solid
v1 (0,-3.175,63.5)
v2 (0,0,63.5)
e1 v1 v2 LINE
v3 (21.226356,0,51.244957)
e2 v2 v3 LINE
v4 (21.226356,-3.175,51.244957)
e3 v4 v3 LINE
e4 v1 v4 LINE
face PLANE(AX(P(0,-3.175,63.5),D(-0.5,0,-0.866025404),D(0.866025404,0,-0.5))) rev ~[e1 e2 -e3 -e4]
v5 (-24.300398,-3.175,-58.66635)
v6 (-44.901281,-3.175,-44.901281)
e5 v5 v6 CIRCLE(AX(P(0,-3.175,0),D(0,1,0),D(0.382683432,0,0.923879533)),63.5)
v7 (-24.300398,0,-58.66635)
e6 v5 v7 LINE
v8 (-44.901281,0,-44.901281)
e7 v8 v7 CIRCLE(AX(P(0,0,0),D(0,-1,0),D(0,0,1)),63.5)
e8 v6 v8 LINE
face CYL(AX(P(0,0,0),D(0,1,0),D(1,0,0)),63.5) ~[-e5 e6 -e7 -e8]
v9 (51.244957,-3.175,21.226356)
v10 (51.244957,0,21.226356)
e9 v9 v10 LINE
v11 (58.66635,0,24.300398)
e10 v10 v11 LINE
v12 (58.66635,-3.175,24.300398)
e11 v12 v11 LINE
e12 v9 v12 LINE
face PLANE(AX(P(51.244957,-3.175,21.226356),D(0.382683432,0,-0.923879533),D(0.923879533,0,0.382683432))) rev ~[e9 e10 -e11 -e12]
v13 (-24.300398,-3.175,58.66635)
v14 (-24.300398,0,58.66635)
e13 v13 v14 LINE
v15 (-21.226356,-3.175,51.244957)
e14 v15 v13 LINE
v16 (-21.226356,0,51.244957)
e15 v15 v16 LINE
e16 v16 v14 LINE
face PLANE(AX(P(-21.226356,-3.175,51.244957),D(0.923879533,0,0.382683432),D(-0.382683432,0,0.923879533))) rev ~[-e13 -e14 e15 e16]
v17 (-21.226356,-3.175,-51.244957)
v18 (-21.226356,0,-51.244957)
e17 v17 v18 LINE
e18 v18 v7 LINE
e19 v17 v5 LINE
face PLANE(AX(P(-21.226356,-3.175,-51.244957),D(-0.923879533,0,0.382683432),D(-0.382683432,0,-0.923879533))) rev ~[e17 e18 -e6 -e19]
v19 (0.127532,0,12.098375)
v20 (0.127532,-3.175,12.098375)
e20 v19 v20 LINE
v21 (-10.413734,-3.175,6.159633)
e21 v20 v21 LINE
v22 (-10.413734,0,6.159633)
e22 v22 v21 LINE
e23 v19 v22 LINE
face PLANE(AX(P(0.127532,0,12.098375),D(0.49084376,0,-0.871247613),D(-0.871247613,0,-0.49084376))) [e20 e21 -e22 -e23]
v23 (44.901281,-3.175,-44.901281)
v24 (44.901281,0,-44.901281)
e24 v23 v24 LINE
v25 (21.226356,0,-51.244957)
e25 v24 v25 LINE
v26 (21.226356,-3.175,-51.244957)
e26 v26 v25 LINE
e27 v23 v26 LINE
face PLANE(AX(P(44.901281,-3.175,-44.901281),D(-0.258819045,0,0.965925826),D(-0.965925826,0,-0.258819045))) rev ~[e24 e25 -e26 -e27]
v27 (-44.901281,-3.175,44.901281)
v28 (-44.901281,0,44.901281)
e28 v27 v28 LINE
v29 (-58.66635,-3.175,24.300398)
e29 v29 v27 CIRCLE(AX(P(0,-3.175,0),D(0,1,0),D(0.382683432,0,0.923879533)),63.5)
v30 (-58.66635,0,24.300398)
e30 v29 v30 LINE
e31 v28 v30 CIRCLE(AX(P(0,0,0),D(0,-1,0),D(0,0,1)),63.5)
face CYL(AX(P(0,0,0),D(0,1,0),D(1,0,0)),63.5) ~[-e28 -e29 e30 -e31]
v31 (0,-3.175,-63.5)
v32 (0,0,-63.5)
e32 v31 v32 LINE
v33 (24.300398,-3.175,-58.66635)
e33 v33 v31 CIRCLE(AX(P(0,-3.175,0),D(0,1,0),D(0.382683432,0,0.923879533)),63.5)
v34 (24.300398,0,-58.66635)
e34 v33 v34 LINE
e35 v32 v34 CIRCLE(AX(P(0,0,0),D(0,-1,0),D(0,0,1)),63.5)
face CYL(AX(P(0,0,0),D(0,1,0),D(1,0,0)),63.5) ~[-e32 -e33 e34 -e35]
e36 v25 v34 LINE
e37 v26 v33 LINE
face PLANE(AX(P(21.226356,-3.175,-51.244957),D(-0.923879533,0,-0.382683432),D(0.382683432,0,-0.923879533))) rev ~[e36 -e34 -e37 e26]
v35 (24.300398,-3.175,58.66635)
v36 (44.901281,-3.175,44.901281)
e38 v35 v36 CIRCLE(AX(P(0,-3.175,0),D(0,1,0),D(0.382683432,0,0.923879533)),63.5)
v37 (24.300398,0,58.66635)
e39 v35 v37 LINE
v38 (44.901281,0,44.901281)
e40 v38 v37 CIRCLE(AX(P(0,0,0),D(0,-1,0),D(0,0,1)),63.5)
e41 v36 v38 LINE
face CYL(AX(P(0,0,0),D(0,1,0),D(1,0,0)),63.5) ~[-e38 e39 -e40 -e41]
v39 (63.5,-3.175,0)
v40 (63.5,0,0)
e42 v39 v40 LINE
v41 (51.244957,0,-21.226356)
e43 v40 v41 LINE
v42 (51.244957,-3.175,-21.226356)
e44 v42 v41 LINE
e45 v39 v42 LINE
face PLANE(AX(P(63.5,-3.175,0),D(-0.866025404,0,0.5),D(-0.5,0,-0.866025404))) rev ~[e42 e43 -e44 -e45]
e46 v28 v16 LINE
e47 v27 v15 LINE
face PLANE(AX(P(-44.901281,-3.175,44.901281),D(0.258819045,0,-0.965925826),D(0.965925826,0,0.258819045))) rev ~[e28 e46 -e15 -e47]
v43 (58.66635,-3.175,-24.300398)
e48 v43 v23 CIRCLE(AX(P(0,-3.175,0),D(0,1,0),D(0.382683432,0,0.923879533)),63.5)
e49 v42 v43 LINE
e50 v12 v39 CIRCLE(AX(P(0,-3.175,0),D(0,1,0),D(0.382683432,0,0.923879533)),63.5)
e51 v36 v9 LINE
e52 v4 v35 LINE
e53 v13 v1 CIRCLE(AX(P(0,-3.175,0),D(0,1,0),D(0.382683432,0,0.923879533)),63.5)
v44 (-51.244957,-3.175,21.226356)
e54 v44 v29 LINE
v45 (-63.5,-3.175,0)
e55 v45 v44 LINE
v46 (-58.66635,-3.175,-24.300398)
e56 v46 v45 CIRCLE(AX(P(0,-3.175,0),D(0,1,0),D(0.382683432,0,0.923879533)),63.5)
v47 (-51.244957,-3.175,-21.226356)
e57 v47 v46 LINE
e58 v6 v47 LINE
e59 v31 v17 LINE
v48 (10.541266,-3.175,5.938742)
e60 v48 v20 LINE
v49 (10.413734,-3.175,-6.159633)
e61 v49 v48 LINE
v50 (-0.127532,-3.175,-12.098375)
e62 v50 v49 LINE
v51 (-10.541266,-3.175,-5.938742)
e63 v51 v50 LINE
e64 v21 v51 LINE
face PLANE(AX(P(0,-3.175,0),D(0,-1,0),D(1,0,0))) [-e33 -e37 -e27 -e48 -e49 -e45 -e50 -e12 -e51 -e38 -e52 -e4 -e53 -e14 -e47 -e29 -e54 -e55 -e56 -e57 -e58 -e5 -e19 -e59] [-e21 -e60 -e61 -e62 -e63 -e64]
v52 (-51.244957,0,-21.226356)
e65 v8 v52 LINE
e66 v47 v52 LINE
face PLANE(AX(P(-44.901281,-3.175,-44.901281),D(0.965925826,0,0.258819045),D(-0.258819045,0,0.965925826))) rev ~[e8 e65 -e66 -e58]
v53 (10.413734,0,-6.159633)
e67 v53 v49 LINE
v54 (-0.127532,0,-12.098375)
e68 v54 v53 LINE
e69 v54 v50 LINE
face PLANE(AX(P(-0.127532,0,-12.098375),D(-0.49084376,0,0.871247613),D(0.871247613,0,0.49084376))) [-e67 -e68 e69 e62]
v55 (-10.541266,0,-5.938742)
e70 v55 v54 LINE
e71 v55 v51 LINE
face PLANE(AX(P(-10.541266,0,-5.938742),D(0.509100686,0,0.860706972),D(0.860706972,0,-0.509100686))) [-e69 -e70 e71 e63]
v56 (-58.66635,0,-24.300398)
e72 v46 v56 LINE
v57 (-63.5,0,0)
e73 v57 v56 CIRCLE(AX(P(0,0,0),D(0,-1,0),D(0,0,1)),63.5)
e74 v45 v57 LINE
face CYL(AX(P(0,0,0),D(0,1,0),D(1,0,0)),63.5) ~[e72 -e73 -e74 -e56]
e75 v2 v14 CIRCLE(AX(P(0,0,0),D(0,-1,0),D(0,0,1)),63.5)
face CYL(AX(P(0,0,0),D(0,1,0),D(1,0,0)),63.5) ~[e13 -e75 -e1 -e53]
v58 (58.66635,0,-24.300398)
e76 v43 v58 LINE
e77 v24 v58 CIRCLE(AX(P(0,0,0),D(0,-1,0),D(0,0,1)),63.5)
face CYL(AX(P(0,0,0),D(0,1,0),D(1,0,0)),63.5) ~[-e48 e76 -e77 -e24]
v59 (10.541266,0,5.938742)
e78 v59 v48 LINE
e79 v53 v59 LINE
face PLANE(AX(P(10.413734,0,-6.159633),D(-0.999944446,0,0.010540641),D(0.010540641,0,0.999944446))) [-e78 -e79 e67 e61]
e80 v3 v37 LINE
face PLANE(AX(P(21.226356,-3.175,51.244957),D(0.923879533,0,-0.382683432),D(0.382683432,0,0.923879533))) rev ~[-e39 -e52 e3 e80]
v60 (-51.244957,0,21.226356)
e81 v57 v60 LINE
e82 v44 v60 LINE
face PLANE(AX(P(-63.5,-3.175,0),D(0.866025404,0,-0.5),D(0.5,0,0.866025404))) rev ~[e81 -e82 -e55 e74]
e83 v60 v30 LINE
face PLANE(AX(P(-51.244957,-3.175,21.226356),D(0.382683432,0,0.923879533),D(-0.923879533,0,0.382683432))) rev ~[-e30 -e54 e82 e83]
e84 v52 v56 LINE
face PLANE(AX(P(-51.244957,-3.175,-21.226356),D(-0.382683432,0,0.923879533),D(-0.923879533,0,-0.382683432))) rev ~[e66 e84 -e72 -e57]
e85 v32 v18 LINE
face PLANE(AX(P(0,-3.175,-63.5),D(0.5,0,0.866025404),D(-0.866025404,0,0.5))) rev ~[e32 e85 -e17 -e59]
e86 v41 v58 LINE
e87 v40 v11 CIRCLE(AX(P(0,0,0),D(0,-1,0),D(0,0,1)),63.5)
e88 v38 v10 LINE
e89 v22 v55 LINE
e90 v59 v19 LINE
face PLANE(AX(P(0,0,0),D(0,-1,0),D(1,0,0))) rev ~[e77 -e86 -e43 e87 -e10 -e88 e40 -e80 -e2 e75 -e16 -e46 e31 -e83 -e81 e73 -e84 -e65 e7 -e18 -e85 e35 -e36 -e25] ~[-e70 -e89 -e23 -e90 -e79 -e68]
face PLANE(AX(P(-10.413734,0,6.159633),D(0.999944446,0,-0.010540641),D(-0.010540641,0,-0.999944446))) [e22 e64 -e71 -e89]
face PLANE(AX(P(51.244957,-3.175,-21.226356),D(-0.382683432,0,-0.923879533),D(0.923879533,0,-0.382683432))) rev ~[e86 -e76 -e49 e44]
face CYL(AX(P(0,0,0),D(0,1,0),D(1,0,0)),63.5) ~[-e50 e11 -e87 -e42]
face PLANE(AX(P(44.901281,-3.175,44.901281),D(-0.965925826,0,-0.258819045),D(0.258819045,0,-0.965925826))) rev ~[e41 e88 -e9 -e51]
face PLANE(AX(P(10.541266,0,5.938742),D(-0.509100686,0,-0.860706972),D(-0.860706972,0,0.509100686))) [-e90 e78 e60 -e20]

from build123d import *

# Parameters (mm, degrees)
F0_R            = 63.5
F1_DEPTH        = 3.175
F3_DEPTH        = 3.175
F3_COPIES_COUNT = 8
F5_DEPTH        = 3.175


# Not quite as in the source:
# - a pattern or mirror of a feature is missing from the dataset's text; its kind, count and spacing are read off the source's solid


with BuildPart() as f1:
    # F0 (on Front) → F1 (new body)
    with BuildSketch(Plane.XZ):
        Circle(F0_R)
    extrude(amount=F1_DEPTH)

    # F2 (on face) → F3 (cut)
    with BuildSketch(Plane.XZ.offset(3.175)):
        with BuildLine():
            Line((0, 63.5), (21.2263563726, 51.2449574344))
            Line((21.2263563726, 51.2449574344), (24.3003979552, 58.6663503145))
            ThreePointArc((24.3003979552, 58.6663503145), (12.388235448, 62.2798653056), (0, 63.5))
        make_face()
    f3 = extrude(amount=-F3_DEPTH, mode=Mode.SUBTRACT)

    # F3_copies: F3 ×8 about axis
    f3_copies_axis = Axis((0, 0, 0), (0, 1, 0))
    for i in range(1, F3_COPIES_COUNT):
        add(f3.rotate(f3_copies_axis, i * 360 / F3_COPIES_COUNT), mode=Mode.SUBTRACT)

    # F4 (on Front) → F5 (cut)
    with BuildSketch(Plane.XZ):
        Polygon((0.1275317148, 12.0983748909), (-10.4137341426, 6.1596331502), (-10.5412658574, -5.9387417407), (-0.1275317148, -12.0983748909), (10.4137341426, -6.1596331502), (10.5412658574, 5.9387417407), align=None)
    extrude(amount=F5_DEPTH, mode=Mode.SUBTRACT)


solid = f1.part
